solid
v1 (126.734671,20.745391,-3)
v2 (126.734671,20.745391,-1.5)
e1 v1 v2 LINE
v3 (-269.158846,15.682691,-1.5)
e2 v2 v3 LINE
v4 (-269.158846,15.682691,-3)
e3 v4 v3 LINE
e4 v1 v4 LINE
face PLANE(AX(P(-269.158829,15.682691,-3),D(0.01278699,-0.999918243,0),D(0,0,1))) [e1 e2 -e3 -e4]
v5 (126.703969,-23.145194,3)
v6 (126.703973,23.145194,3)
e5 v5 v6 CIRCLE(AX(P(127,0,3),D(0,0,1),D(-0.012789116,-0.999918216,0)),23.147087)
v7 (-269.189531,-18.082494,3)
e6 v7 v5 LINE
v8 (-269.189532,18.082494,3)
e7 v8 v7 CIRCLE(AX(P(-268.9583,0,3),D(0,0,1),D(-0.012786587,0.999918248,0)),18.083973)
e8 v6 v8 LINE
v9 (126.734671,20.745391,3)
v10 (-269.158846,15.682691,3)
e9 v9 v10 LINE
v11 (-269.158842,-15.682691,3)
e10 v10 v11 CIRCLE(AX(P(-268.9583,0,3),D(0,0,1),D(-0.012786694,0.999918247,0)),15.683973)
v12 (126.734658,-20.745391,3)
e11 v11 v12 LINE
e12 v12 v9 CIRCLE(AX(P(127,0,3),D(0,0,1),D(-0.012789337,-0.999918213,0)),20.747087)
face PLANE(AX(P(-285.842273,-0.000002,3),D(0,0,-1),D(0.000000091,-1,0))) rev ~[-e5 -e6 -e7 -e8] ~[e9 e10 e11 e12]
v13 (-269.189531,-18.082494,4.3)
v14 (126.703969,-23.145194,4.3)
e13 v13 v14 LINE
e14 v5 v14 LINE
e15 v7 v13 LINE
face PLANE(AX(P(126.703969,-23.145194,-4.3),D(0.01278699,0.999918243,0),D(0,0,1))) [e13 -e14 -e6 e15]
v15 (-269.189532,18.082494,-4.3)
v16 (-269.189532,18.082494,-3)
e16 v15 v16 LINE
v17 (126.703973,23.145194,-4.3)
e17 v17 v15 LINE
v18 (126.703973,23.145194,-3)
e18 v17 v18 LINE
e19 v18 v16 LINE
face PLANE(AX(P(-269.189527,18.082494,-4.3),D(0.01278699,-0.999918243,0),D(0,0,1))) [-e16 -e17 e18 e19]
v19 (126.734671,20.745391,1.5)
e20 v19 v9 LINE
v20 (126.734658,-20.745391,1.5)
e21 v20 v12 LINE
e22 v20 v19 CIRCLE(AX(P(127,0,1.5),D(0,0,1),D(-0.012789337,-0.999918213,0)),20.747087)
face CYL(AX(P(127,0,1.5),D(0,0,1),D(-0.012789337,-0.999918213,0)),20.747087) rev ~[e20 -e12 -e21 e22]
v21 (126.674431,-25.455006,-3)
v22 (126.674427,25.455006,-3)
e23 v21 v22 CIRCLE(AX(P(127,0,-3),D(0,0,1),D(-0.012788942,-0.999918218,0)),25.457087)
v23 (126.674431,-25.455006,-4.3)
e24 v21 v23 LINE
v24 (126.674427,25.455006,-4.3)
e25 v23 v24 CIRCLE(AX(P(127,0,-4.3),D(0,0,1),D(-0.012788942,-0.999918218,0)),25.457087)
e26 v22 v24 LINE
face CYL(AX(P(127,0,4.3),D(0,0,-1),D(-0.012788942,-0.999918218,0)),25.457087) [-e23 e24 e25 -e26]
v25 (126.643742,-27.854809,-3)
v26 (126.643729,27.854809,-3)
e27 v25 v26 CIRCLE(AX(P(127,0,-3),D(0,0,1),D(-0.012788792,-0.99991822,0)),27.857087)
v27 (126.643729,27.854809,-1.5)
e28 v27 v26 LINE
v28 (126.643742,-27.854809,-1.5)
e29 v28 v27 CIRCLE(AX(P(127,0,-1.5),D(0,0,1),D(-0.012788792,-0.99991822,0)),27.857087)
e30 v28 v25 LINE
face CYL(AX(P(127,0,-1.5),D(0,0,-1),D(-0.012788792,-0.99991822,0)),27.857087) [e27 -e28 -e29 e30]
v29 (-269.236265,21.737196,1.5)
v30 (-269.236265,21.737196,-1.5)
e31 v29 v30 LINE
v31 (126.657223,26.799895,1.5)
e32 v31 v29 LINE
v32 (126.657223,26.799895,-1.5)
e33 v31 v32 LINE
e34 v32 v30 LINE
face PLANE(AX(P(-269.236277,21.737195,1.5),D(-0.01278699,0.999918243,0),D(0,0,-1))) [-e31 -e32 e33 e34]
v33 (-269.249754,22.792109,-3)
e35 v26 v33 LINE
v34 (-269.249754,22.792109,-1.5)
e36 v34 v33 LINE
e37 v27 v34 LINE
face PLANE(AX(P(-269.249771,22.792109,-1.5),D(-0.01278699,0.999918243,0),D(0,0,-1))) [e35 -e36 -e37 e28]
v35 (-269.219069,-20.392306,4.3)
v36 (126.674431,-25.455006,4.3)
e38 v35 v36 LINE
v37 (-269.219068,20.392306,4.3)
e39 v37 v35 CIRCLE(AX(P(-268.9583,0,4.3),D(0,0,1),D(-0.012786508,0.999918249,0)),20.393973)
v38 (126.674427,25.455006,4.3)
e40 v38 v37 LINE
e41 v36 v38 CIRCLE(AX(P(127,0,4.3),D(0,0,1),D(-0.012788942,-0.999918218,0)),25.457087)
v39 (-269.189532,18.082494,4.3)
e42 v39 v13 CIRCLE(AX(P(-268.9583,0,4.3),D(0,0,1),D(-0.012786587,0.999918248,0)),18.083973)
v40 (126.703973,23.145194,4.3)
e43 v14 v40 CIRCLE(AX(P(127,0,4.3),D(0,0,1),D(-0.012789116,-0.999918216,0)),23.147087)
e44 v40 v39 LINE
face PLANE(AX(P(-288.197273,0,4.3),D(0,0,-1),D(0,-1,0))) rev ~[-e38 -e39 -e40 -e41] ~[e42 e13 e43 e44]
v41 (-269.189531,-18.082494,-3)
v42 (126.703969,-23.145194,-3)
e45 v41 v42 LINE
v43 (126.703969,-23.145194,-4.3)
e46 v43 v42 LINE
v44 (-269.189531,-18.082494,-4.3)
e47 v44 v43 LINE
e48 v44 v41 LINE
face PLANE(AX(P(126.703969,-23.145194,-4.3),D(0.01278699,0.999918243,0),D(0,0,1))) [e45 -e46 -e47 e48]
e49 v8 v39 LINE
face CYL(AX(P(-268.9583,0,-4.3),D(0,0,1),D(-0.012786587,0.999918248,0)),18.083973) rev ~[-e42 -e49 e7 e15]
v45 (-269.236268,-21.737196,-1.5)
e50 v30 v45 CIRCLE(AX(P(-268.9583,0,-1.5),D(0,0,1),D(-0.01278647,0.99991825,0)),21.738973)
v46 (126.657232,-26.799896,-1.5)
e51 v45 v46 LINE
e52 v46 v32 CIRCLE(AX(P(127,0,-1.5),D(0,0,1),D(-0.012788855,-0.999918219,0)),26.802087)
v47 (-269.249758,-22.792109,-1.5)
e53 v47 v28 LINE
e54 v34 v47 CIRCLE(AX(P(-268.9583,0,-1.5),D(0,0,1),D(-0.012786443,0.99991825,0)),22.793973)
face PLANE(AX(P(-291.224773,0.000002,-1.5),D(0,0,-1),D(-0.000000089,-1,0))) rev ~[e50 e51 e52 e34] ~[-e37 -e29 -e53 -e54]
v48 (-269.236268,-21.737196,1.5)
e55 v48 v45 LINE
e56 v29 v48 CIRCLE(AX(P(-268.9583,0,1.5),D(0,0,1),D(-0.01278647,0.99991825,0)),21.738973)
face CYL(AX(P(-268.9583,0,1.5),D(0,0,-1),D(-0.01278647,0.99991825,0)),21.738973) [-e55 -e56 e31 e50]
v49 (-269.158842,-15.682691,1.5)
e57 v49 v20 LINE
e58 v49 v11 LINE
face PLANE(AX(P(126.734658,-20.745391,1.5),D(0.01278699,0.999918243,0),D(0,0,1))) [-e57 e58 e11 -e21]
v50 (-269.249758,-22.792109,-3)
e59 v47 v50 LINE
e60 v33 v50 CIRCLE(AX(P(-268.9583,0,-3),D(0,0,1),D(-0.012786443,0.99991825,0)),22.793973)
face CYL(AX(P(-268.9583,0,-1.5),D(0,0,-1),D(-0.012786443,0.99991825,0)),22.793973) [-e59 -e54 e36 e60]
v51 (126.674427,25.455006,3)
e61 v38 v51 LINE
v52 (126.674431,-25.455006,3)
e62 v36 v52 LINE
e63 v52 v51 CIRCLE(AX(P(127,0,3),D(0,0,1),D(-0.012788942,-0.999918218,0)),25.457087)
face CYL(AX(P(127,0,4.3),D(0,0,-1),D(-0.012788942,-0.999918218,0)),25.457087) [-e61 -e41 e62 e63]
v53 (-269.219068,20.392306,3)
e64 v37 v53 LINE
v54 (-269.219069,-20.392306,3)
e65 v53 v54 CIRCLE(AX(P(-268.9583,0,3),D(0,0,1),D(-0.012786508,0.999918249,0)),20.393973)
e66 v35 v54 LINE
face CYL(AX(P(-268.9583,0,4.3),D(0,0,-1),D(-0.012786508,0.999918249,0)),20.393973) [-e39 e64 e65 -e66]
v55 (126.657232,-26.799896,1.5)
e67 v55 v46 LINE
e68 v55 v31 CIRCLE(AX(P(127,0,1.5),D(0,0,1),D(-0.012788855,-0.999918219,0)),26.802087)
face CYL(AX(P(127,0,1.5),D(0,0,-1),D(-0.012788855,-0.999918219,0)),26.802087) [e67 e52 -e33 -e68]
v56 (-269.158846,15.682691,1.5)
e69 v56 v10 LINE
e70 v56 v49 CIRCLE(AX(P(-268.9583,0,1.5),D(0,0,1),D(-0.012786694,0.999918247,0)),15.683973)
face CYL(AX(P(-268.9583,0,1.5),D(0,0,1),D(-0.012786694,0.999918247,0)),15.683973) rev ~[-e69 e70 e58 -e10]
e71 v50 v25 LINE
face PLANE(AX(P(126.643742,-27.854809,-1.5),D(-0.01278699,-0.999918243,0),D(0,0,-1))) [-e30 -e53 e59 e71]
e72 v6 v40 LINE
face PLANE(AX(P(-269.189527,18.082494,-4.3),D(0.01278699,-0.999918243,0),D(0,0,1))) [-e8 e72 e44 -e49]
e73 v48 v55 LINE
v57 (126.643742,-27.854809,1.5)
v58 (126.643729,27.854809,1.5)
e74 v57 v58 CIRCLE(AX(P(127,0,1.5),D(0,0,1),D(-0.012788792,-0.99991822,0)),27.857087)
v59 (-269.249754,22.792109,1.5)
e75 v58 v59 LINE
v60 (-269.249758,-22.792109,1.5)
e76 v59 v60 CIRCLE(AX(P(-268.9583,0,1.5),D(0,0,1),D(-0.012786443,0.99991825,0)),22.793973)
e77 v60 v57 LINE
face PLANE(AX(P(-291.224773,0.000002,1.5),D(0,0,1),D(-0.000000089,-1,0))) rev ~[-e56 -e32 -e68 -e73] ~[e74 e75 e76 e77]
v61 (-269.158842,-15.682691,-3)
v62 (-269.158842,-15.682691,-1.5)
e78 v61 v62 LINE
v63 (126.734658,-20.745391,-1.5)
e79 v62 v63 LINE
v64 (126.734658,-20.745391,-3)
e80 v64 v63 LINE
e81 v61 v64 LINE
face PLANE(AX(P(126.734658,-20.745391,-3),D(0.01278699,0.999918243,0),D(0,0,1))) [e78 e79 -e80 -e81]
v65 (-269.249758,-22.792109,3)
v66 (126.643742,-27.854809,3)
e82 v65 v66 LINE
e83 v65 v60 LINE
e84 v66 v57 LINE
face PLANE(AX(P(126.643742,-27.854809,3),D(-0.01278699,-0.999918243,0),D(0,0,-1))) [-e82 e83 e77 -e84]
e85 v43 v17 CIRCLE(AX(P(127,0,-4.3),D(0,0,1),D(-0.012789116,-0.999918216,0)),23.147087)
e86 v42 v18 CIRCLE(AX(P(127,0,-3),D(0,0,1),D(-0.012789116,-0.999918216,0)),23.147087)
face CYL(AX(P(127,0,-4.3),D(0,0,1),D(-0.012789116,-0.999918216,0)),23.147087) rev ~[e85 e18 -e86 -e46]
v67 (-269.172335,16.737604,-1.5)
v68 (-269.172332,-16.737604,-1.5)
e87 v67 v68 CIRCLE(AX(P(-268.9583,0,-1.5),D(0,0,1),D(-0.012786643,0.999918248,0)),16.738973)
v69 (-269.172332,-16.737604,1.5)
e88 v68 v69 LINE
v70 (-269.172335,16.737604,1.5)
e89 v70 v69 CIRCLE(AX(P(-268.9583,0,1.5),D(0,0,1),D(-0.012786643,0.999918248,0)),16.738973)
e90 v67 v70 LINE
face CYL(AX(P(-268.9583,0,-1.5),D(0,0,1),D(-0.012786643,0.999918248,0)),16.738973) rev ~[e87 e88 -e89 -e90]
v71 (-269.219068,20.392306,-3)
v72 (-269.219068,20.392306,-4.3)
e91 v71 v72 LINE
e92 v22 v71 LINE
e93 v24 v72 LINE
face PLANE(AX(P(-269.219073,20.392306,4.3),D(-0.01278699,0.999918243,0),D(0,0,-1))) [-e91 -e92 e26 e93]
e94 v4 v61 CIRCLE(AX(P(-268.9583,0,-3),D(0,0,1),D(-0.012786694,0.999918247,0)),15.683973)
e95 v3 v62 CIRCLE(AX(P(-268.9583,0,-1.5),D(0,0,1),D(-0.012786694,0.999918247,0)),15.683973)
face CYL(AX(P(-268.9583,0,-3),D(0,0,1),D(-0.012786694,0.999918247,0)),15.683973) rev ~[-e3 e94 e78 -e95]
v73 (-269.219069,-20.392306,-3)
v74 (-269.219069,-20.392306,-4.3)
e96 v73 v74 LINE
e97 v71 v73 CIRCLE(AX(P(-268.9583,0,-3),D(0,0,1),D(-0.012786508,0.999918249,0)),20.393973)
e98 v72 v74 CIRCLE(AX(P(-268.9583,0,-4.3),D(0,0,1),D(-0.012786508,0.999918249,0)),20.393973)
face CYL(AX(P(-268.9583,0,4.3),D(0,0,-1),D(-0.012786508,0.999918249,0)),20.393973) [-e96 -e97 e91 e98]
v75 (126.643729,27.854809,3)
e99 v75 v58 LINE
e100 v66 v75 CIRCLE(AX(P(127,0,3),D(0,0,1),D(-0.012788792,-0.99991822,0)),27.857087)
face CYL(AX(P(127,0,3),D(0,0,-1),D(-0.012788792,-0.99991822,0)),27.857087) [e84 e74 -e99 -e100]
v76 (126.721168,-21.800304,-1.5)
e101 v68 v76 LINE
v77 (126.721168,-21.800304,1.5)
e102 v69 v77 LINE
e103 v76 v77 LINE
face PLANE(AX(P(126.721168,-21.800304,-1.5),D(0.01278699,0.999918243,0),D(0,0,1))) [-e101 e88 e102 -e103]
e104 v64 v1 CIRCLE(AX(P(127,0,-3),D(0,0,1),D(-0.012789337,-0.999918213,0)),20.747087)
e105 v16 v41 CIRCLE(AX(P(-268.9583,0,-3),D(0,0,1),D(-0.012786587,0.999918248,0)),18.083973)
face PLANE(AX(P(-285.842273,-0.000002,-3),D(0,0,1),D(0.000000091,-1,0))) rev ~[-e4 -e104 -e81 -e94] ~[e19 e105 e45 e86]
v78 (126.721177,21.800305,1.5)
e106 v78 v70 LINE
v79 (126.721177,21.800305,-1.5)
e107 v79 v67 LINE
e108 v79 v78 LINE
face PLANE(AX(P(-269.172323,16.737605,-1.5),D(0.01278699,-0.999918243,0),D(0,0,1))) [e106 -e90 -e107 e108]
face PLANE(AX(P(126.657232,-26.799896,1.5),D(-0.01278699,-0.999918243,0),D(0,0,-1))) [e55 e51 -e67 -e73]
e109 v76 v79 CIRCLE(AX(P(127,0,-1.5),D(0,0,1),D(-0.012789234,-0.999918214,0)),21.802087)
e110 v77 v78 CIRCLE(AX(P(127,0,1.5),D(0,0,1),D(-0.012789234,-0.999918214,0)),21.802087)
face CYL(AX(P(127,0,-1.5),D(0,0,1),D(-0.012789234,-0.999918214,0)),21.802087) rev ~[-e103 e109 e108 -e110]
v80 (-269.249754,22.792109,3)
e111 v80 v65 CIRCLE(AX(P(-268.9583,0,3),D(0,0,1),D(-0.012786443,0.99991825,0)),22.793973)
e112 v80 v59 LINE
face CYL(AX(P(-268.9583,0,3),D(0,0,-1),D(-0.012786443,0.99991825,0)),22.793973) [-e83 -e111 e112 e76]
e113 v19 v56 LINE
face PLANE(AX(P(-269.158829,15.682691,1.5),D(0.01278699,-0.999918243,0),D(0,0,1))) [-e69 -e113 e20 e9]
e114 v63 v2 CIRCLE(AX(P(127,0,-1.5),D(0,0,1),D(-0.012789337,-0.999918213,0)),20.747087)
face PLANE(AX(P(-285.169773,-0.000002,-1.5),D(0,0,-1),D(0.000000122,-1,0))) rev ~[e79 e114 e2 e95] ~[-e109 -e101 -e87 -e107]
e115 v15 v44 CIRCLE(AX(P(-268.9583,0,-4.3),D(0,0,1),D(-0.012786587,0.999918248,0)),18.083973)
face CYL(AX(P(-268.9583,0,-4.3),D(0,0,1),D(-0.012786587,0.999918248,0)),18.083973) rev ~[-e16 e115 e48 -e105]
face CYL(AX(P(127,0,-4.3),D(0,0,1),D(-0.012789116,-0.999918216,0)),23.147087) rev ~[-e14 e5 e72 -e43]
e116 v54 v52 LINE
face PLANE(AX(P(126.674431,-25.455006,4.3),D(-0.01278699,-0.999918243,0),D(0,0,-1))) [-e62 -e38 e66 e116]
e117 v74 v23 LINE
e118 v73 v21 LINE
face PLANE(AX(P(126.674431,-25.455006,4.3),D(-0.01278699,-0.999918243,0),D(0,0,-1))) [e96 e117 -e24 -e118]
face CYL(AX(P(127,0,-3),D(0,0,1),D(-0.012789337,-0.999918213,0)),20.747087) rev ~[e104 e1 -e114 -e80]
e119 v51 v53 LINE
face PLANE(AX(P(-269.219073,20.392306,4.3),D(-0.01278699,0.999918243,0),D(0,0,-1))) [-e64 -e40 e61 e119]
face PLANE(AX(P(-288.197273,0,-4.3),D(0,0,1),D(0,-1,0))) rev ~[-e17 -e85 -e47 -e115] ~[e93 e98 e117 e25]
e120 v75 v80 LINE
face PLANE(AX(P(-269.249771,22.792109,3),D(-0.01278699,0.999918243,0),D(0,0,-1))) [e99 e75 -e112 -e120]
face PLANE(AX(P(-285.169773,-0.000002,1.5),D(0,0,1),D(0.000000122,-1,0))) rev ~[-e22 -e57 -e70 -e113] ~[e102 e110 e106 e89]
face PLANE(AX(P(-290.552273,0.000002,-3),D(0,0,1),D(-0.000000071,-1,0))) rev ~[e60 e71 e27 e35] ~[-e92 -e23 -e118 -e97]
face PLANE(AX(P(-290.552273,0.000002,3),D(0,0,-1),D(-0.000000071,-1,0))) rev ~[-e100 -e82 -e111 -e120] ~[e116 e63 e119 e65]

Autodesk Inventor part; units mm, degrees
ref_plane "Work Plane2" through (-268.9583, 0, 0) normal (-1, 0, 0) x (0, 0, 1)
ref_plane "Work Plane3" through (127, 0, 0) normal (-0.9863319, 0.1647708, 0) x (0, 0, 1)
sketch "Path" plane through (0, 0, 0) normal (0, 0, 1) x (1, 0, 0)
  arc A0 (-269.2043, 19.2374) -> (-269.2043, -19.2374) centre (-268.9583, 0) ccw
  arc A1 (126.6892, -24.3001) -> (126.6892, 24.3001) centre (127, 0) ccw
  line L0 (126.6892, -24.3001) -> (-269.2043, -19.2374)
  line L1 (-269.2043, 19.2374) -> (126.6892, 24.3001)
  dimension "d31" = 7.11
ref_plane "Section Plane" through (-269.2043, -19.2374, 0) normal (0.9999182, -0.0127872, 0) x (0, 0, 1)
sketch "Section Sketch" plane through (-269.2043, -19.2374, 0) normal (0.9999182, -0.0127872, 0) x (0, 0, 1)
  line L0 (-4.3, -1.155) -> (4.3, -1.155)
  line L1 (4.3, -1.155) -> (4.3, 1.155)
  line L2 (4.3, 1.155) -> (-4.3, 1.155)
  line L3 (-4.3, 1.155) -> (-4.3, -1.155)
  line L4 (-1.5, -2.5) -> (1.5, -2.5)
  line L5 (1.5, -2.5) -> (1.5, 2.5)
  line L6 (1.5, 2.5) -> (-1.5, 2.5)
  line L7 (-1.5, 2.5) -> (-1.5, -2.5)
  line L8 (-1.5, 0) -> (1.5, 0) construction
  line L9 (-3, -3.555) -> (-1.5, -3.555)
  line L10 (-1.5, -3.555) -> (-1.5, 3.555)
  line L11 (-1.5, 3.555) -> (-3, 3.555)
  line L12 (-3, 3.555) -> (-3, -3.555)
  line L13 (1.5, -3.555) -> (3, -3.555)
  line L14 (3, -3.555) -> (3, 3.555)
  line L15 (3, 3.555) -> (1.5, 3.555)
  line L16 (1.5, 3.555) -> (1.5, -3.555)
  line L17 (-4.3, 0) -> (4.3, 0) construction
  point P0 (0, 0)
  point P1 (0, 0)
  dimension "d21" = 2.31
  dimension "d22" = 5
  dimension "d23" = 3
  dimension "d24" = 1.5
  dimension "d31" = 7.11
  dimension "d32" = 8.6
sweep "Solid" add profiles "Section Sketch" path "Path"
pattern_of_one "Strand Pattern"
equation "\"d21\" = da_d2"
equation "\"d22\" = da_d1"
equation "\"d23\" = da_b1"
equation "\"d24\" = da_t1 + da_t2"
equation "\"d30\" = da_pt"
equation "\"da_p\" = 8"
equation "\"da_b1\" = 3"
equation "\"da_h2\" = 7.11"
equation "\"da_h3\" = 7.11"
equation "\"da_d1\" = 5"
equation "\"da_d2\" = 2.31"
equation "\"da_pt\" = 5.64"
equation "\"da_b\" = 8.6"
equation "\"da_t1\" = 0.75"
equation "\"da_t2\" = 0.75"
properties part number "Roller Chain"
